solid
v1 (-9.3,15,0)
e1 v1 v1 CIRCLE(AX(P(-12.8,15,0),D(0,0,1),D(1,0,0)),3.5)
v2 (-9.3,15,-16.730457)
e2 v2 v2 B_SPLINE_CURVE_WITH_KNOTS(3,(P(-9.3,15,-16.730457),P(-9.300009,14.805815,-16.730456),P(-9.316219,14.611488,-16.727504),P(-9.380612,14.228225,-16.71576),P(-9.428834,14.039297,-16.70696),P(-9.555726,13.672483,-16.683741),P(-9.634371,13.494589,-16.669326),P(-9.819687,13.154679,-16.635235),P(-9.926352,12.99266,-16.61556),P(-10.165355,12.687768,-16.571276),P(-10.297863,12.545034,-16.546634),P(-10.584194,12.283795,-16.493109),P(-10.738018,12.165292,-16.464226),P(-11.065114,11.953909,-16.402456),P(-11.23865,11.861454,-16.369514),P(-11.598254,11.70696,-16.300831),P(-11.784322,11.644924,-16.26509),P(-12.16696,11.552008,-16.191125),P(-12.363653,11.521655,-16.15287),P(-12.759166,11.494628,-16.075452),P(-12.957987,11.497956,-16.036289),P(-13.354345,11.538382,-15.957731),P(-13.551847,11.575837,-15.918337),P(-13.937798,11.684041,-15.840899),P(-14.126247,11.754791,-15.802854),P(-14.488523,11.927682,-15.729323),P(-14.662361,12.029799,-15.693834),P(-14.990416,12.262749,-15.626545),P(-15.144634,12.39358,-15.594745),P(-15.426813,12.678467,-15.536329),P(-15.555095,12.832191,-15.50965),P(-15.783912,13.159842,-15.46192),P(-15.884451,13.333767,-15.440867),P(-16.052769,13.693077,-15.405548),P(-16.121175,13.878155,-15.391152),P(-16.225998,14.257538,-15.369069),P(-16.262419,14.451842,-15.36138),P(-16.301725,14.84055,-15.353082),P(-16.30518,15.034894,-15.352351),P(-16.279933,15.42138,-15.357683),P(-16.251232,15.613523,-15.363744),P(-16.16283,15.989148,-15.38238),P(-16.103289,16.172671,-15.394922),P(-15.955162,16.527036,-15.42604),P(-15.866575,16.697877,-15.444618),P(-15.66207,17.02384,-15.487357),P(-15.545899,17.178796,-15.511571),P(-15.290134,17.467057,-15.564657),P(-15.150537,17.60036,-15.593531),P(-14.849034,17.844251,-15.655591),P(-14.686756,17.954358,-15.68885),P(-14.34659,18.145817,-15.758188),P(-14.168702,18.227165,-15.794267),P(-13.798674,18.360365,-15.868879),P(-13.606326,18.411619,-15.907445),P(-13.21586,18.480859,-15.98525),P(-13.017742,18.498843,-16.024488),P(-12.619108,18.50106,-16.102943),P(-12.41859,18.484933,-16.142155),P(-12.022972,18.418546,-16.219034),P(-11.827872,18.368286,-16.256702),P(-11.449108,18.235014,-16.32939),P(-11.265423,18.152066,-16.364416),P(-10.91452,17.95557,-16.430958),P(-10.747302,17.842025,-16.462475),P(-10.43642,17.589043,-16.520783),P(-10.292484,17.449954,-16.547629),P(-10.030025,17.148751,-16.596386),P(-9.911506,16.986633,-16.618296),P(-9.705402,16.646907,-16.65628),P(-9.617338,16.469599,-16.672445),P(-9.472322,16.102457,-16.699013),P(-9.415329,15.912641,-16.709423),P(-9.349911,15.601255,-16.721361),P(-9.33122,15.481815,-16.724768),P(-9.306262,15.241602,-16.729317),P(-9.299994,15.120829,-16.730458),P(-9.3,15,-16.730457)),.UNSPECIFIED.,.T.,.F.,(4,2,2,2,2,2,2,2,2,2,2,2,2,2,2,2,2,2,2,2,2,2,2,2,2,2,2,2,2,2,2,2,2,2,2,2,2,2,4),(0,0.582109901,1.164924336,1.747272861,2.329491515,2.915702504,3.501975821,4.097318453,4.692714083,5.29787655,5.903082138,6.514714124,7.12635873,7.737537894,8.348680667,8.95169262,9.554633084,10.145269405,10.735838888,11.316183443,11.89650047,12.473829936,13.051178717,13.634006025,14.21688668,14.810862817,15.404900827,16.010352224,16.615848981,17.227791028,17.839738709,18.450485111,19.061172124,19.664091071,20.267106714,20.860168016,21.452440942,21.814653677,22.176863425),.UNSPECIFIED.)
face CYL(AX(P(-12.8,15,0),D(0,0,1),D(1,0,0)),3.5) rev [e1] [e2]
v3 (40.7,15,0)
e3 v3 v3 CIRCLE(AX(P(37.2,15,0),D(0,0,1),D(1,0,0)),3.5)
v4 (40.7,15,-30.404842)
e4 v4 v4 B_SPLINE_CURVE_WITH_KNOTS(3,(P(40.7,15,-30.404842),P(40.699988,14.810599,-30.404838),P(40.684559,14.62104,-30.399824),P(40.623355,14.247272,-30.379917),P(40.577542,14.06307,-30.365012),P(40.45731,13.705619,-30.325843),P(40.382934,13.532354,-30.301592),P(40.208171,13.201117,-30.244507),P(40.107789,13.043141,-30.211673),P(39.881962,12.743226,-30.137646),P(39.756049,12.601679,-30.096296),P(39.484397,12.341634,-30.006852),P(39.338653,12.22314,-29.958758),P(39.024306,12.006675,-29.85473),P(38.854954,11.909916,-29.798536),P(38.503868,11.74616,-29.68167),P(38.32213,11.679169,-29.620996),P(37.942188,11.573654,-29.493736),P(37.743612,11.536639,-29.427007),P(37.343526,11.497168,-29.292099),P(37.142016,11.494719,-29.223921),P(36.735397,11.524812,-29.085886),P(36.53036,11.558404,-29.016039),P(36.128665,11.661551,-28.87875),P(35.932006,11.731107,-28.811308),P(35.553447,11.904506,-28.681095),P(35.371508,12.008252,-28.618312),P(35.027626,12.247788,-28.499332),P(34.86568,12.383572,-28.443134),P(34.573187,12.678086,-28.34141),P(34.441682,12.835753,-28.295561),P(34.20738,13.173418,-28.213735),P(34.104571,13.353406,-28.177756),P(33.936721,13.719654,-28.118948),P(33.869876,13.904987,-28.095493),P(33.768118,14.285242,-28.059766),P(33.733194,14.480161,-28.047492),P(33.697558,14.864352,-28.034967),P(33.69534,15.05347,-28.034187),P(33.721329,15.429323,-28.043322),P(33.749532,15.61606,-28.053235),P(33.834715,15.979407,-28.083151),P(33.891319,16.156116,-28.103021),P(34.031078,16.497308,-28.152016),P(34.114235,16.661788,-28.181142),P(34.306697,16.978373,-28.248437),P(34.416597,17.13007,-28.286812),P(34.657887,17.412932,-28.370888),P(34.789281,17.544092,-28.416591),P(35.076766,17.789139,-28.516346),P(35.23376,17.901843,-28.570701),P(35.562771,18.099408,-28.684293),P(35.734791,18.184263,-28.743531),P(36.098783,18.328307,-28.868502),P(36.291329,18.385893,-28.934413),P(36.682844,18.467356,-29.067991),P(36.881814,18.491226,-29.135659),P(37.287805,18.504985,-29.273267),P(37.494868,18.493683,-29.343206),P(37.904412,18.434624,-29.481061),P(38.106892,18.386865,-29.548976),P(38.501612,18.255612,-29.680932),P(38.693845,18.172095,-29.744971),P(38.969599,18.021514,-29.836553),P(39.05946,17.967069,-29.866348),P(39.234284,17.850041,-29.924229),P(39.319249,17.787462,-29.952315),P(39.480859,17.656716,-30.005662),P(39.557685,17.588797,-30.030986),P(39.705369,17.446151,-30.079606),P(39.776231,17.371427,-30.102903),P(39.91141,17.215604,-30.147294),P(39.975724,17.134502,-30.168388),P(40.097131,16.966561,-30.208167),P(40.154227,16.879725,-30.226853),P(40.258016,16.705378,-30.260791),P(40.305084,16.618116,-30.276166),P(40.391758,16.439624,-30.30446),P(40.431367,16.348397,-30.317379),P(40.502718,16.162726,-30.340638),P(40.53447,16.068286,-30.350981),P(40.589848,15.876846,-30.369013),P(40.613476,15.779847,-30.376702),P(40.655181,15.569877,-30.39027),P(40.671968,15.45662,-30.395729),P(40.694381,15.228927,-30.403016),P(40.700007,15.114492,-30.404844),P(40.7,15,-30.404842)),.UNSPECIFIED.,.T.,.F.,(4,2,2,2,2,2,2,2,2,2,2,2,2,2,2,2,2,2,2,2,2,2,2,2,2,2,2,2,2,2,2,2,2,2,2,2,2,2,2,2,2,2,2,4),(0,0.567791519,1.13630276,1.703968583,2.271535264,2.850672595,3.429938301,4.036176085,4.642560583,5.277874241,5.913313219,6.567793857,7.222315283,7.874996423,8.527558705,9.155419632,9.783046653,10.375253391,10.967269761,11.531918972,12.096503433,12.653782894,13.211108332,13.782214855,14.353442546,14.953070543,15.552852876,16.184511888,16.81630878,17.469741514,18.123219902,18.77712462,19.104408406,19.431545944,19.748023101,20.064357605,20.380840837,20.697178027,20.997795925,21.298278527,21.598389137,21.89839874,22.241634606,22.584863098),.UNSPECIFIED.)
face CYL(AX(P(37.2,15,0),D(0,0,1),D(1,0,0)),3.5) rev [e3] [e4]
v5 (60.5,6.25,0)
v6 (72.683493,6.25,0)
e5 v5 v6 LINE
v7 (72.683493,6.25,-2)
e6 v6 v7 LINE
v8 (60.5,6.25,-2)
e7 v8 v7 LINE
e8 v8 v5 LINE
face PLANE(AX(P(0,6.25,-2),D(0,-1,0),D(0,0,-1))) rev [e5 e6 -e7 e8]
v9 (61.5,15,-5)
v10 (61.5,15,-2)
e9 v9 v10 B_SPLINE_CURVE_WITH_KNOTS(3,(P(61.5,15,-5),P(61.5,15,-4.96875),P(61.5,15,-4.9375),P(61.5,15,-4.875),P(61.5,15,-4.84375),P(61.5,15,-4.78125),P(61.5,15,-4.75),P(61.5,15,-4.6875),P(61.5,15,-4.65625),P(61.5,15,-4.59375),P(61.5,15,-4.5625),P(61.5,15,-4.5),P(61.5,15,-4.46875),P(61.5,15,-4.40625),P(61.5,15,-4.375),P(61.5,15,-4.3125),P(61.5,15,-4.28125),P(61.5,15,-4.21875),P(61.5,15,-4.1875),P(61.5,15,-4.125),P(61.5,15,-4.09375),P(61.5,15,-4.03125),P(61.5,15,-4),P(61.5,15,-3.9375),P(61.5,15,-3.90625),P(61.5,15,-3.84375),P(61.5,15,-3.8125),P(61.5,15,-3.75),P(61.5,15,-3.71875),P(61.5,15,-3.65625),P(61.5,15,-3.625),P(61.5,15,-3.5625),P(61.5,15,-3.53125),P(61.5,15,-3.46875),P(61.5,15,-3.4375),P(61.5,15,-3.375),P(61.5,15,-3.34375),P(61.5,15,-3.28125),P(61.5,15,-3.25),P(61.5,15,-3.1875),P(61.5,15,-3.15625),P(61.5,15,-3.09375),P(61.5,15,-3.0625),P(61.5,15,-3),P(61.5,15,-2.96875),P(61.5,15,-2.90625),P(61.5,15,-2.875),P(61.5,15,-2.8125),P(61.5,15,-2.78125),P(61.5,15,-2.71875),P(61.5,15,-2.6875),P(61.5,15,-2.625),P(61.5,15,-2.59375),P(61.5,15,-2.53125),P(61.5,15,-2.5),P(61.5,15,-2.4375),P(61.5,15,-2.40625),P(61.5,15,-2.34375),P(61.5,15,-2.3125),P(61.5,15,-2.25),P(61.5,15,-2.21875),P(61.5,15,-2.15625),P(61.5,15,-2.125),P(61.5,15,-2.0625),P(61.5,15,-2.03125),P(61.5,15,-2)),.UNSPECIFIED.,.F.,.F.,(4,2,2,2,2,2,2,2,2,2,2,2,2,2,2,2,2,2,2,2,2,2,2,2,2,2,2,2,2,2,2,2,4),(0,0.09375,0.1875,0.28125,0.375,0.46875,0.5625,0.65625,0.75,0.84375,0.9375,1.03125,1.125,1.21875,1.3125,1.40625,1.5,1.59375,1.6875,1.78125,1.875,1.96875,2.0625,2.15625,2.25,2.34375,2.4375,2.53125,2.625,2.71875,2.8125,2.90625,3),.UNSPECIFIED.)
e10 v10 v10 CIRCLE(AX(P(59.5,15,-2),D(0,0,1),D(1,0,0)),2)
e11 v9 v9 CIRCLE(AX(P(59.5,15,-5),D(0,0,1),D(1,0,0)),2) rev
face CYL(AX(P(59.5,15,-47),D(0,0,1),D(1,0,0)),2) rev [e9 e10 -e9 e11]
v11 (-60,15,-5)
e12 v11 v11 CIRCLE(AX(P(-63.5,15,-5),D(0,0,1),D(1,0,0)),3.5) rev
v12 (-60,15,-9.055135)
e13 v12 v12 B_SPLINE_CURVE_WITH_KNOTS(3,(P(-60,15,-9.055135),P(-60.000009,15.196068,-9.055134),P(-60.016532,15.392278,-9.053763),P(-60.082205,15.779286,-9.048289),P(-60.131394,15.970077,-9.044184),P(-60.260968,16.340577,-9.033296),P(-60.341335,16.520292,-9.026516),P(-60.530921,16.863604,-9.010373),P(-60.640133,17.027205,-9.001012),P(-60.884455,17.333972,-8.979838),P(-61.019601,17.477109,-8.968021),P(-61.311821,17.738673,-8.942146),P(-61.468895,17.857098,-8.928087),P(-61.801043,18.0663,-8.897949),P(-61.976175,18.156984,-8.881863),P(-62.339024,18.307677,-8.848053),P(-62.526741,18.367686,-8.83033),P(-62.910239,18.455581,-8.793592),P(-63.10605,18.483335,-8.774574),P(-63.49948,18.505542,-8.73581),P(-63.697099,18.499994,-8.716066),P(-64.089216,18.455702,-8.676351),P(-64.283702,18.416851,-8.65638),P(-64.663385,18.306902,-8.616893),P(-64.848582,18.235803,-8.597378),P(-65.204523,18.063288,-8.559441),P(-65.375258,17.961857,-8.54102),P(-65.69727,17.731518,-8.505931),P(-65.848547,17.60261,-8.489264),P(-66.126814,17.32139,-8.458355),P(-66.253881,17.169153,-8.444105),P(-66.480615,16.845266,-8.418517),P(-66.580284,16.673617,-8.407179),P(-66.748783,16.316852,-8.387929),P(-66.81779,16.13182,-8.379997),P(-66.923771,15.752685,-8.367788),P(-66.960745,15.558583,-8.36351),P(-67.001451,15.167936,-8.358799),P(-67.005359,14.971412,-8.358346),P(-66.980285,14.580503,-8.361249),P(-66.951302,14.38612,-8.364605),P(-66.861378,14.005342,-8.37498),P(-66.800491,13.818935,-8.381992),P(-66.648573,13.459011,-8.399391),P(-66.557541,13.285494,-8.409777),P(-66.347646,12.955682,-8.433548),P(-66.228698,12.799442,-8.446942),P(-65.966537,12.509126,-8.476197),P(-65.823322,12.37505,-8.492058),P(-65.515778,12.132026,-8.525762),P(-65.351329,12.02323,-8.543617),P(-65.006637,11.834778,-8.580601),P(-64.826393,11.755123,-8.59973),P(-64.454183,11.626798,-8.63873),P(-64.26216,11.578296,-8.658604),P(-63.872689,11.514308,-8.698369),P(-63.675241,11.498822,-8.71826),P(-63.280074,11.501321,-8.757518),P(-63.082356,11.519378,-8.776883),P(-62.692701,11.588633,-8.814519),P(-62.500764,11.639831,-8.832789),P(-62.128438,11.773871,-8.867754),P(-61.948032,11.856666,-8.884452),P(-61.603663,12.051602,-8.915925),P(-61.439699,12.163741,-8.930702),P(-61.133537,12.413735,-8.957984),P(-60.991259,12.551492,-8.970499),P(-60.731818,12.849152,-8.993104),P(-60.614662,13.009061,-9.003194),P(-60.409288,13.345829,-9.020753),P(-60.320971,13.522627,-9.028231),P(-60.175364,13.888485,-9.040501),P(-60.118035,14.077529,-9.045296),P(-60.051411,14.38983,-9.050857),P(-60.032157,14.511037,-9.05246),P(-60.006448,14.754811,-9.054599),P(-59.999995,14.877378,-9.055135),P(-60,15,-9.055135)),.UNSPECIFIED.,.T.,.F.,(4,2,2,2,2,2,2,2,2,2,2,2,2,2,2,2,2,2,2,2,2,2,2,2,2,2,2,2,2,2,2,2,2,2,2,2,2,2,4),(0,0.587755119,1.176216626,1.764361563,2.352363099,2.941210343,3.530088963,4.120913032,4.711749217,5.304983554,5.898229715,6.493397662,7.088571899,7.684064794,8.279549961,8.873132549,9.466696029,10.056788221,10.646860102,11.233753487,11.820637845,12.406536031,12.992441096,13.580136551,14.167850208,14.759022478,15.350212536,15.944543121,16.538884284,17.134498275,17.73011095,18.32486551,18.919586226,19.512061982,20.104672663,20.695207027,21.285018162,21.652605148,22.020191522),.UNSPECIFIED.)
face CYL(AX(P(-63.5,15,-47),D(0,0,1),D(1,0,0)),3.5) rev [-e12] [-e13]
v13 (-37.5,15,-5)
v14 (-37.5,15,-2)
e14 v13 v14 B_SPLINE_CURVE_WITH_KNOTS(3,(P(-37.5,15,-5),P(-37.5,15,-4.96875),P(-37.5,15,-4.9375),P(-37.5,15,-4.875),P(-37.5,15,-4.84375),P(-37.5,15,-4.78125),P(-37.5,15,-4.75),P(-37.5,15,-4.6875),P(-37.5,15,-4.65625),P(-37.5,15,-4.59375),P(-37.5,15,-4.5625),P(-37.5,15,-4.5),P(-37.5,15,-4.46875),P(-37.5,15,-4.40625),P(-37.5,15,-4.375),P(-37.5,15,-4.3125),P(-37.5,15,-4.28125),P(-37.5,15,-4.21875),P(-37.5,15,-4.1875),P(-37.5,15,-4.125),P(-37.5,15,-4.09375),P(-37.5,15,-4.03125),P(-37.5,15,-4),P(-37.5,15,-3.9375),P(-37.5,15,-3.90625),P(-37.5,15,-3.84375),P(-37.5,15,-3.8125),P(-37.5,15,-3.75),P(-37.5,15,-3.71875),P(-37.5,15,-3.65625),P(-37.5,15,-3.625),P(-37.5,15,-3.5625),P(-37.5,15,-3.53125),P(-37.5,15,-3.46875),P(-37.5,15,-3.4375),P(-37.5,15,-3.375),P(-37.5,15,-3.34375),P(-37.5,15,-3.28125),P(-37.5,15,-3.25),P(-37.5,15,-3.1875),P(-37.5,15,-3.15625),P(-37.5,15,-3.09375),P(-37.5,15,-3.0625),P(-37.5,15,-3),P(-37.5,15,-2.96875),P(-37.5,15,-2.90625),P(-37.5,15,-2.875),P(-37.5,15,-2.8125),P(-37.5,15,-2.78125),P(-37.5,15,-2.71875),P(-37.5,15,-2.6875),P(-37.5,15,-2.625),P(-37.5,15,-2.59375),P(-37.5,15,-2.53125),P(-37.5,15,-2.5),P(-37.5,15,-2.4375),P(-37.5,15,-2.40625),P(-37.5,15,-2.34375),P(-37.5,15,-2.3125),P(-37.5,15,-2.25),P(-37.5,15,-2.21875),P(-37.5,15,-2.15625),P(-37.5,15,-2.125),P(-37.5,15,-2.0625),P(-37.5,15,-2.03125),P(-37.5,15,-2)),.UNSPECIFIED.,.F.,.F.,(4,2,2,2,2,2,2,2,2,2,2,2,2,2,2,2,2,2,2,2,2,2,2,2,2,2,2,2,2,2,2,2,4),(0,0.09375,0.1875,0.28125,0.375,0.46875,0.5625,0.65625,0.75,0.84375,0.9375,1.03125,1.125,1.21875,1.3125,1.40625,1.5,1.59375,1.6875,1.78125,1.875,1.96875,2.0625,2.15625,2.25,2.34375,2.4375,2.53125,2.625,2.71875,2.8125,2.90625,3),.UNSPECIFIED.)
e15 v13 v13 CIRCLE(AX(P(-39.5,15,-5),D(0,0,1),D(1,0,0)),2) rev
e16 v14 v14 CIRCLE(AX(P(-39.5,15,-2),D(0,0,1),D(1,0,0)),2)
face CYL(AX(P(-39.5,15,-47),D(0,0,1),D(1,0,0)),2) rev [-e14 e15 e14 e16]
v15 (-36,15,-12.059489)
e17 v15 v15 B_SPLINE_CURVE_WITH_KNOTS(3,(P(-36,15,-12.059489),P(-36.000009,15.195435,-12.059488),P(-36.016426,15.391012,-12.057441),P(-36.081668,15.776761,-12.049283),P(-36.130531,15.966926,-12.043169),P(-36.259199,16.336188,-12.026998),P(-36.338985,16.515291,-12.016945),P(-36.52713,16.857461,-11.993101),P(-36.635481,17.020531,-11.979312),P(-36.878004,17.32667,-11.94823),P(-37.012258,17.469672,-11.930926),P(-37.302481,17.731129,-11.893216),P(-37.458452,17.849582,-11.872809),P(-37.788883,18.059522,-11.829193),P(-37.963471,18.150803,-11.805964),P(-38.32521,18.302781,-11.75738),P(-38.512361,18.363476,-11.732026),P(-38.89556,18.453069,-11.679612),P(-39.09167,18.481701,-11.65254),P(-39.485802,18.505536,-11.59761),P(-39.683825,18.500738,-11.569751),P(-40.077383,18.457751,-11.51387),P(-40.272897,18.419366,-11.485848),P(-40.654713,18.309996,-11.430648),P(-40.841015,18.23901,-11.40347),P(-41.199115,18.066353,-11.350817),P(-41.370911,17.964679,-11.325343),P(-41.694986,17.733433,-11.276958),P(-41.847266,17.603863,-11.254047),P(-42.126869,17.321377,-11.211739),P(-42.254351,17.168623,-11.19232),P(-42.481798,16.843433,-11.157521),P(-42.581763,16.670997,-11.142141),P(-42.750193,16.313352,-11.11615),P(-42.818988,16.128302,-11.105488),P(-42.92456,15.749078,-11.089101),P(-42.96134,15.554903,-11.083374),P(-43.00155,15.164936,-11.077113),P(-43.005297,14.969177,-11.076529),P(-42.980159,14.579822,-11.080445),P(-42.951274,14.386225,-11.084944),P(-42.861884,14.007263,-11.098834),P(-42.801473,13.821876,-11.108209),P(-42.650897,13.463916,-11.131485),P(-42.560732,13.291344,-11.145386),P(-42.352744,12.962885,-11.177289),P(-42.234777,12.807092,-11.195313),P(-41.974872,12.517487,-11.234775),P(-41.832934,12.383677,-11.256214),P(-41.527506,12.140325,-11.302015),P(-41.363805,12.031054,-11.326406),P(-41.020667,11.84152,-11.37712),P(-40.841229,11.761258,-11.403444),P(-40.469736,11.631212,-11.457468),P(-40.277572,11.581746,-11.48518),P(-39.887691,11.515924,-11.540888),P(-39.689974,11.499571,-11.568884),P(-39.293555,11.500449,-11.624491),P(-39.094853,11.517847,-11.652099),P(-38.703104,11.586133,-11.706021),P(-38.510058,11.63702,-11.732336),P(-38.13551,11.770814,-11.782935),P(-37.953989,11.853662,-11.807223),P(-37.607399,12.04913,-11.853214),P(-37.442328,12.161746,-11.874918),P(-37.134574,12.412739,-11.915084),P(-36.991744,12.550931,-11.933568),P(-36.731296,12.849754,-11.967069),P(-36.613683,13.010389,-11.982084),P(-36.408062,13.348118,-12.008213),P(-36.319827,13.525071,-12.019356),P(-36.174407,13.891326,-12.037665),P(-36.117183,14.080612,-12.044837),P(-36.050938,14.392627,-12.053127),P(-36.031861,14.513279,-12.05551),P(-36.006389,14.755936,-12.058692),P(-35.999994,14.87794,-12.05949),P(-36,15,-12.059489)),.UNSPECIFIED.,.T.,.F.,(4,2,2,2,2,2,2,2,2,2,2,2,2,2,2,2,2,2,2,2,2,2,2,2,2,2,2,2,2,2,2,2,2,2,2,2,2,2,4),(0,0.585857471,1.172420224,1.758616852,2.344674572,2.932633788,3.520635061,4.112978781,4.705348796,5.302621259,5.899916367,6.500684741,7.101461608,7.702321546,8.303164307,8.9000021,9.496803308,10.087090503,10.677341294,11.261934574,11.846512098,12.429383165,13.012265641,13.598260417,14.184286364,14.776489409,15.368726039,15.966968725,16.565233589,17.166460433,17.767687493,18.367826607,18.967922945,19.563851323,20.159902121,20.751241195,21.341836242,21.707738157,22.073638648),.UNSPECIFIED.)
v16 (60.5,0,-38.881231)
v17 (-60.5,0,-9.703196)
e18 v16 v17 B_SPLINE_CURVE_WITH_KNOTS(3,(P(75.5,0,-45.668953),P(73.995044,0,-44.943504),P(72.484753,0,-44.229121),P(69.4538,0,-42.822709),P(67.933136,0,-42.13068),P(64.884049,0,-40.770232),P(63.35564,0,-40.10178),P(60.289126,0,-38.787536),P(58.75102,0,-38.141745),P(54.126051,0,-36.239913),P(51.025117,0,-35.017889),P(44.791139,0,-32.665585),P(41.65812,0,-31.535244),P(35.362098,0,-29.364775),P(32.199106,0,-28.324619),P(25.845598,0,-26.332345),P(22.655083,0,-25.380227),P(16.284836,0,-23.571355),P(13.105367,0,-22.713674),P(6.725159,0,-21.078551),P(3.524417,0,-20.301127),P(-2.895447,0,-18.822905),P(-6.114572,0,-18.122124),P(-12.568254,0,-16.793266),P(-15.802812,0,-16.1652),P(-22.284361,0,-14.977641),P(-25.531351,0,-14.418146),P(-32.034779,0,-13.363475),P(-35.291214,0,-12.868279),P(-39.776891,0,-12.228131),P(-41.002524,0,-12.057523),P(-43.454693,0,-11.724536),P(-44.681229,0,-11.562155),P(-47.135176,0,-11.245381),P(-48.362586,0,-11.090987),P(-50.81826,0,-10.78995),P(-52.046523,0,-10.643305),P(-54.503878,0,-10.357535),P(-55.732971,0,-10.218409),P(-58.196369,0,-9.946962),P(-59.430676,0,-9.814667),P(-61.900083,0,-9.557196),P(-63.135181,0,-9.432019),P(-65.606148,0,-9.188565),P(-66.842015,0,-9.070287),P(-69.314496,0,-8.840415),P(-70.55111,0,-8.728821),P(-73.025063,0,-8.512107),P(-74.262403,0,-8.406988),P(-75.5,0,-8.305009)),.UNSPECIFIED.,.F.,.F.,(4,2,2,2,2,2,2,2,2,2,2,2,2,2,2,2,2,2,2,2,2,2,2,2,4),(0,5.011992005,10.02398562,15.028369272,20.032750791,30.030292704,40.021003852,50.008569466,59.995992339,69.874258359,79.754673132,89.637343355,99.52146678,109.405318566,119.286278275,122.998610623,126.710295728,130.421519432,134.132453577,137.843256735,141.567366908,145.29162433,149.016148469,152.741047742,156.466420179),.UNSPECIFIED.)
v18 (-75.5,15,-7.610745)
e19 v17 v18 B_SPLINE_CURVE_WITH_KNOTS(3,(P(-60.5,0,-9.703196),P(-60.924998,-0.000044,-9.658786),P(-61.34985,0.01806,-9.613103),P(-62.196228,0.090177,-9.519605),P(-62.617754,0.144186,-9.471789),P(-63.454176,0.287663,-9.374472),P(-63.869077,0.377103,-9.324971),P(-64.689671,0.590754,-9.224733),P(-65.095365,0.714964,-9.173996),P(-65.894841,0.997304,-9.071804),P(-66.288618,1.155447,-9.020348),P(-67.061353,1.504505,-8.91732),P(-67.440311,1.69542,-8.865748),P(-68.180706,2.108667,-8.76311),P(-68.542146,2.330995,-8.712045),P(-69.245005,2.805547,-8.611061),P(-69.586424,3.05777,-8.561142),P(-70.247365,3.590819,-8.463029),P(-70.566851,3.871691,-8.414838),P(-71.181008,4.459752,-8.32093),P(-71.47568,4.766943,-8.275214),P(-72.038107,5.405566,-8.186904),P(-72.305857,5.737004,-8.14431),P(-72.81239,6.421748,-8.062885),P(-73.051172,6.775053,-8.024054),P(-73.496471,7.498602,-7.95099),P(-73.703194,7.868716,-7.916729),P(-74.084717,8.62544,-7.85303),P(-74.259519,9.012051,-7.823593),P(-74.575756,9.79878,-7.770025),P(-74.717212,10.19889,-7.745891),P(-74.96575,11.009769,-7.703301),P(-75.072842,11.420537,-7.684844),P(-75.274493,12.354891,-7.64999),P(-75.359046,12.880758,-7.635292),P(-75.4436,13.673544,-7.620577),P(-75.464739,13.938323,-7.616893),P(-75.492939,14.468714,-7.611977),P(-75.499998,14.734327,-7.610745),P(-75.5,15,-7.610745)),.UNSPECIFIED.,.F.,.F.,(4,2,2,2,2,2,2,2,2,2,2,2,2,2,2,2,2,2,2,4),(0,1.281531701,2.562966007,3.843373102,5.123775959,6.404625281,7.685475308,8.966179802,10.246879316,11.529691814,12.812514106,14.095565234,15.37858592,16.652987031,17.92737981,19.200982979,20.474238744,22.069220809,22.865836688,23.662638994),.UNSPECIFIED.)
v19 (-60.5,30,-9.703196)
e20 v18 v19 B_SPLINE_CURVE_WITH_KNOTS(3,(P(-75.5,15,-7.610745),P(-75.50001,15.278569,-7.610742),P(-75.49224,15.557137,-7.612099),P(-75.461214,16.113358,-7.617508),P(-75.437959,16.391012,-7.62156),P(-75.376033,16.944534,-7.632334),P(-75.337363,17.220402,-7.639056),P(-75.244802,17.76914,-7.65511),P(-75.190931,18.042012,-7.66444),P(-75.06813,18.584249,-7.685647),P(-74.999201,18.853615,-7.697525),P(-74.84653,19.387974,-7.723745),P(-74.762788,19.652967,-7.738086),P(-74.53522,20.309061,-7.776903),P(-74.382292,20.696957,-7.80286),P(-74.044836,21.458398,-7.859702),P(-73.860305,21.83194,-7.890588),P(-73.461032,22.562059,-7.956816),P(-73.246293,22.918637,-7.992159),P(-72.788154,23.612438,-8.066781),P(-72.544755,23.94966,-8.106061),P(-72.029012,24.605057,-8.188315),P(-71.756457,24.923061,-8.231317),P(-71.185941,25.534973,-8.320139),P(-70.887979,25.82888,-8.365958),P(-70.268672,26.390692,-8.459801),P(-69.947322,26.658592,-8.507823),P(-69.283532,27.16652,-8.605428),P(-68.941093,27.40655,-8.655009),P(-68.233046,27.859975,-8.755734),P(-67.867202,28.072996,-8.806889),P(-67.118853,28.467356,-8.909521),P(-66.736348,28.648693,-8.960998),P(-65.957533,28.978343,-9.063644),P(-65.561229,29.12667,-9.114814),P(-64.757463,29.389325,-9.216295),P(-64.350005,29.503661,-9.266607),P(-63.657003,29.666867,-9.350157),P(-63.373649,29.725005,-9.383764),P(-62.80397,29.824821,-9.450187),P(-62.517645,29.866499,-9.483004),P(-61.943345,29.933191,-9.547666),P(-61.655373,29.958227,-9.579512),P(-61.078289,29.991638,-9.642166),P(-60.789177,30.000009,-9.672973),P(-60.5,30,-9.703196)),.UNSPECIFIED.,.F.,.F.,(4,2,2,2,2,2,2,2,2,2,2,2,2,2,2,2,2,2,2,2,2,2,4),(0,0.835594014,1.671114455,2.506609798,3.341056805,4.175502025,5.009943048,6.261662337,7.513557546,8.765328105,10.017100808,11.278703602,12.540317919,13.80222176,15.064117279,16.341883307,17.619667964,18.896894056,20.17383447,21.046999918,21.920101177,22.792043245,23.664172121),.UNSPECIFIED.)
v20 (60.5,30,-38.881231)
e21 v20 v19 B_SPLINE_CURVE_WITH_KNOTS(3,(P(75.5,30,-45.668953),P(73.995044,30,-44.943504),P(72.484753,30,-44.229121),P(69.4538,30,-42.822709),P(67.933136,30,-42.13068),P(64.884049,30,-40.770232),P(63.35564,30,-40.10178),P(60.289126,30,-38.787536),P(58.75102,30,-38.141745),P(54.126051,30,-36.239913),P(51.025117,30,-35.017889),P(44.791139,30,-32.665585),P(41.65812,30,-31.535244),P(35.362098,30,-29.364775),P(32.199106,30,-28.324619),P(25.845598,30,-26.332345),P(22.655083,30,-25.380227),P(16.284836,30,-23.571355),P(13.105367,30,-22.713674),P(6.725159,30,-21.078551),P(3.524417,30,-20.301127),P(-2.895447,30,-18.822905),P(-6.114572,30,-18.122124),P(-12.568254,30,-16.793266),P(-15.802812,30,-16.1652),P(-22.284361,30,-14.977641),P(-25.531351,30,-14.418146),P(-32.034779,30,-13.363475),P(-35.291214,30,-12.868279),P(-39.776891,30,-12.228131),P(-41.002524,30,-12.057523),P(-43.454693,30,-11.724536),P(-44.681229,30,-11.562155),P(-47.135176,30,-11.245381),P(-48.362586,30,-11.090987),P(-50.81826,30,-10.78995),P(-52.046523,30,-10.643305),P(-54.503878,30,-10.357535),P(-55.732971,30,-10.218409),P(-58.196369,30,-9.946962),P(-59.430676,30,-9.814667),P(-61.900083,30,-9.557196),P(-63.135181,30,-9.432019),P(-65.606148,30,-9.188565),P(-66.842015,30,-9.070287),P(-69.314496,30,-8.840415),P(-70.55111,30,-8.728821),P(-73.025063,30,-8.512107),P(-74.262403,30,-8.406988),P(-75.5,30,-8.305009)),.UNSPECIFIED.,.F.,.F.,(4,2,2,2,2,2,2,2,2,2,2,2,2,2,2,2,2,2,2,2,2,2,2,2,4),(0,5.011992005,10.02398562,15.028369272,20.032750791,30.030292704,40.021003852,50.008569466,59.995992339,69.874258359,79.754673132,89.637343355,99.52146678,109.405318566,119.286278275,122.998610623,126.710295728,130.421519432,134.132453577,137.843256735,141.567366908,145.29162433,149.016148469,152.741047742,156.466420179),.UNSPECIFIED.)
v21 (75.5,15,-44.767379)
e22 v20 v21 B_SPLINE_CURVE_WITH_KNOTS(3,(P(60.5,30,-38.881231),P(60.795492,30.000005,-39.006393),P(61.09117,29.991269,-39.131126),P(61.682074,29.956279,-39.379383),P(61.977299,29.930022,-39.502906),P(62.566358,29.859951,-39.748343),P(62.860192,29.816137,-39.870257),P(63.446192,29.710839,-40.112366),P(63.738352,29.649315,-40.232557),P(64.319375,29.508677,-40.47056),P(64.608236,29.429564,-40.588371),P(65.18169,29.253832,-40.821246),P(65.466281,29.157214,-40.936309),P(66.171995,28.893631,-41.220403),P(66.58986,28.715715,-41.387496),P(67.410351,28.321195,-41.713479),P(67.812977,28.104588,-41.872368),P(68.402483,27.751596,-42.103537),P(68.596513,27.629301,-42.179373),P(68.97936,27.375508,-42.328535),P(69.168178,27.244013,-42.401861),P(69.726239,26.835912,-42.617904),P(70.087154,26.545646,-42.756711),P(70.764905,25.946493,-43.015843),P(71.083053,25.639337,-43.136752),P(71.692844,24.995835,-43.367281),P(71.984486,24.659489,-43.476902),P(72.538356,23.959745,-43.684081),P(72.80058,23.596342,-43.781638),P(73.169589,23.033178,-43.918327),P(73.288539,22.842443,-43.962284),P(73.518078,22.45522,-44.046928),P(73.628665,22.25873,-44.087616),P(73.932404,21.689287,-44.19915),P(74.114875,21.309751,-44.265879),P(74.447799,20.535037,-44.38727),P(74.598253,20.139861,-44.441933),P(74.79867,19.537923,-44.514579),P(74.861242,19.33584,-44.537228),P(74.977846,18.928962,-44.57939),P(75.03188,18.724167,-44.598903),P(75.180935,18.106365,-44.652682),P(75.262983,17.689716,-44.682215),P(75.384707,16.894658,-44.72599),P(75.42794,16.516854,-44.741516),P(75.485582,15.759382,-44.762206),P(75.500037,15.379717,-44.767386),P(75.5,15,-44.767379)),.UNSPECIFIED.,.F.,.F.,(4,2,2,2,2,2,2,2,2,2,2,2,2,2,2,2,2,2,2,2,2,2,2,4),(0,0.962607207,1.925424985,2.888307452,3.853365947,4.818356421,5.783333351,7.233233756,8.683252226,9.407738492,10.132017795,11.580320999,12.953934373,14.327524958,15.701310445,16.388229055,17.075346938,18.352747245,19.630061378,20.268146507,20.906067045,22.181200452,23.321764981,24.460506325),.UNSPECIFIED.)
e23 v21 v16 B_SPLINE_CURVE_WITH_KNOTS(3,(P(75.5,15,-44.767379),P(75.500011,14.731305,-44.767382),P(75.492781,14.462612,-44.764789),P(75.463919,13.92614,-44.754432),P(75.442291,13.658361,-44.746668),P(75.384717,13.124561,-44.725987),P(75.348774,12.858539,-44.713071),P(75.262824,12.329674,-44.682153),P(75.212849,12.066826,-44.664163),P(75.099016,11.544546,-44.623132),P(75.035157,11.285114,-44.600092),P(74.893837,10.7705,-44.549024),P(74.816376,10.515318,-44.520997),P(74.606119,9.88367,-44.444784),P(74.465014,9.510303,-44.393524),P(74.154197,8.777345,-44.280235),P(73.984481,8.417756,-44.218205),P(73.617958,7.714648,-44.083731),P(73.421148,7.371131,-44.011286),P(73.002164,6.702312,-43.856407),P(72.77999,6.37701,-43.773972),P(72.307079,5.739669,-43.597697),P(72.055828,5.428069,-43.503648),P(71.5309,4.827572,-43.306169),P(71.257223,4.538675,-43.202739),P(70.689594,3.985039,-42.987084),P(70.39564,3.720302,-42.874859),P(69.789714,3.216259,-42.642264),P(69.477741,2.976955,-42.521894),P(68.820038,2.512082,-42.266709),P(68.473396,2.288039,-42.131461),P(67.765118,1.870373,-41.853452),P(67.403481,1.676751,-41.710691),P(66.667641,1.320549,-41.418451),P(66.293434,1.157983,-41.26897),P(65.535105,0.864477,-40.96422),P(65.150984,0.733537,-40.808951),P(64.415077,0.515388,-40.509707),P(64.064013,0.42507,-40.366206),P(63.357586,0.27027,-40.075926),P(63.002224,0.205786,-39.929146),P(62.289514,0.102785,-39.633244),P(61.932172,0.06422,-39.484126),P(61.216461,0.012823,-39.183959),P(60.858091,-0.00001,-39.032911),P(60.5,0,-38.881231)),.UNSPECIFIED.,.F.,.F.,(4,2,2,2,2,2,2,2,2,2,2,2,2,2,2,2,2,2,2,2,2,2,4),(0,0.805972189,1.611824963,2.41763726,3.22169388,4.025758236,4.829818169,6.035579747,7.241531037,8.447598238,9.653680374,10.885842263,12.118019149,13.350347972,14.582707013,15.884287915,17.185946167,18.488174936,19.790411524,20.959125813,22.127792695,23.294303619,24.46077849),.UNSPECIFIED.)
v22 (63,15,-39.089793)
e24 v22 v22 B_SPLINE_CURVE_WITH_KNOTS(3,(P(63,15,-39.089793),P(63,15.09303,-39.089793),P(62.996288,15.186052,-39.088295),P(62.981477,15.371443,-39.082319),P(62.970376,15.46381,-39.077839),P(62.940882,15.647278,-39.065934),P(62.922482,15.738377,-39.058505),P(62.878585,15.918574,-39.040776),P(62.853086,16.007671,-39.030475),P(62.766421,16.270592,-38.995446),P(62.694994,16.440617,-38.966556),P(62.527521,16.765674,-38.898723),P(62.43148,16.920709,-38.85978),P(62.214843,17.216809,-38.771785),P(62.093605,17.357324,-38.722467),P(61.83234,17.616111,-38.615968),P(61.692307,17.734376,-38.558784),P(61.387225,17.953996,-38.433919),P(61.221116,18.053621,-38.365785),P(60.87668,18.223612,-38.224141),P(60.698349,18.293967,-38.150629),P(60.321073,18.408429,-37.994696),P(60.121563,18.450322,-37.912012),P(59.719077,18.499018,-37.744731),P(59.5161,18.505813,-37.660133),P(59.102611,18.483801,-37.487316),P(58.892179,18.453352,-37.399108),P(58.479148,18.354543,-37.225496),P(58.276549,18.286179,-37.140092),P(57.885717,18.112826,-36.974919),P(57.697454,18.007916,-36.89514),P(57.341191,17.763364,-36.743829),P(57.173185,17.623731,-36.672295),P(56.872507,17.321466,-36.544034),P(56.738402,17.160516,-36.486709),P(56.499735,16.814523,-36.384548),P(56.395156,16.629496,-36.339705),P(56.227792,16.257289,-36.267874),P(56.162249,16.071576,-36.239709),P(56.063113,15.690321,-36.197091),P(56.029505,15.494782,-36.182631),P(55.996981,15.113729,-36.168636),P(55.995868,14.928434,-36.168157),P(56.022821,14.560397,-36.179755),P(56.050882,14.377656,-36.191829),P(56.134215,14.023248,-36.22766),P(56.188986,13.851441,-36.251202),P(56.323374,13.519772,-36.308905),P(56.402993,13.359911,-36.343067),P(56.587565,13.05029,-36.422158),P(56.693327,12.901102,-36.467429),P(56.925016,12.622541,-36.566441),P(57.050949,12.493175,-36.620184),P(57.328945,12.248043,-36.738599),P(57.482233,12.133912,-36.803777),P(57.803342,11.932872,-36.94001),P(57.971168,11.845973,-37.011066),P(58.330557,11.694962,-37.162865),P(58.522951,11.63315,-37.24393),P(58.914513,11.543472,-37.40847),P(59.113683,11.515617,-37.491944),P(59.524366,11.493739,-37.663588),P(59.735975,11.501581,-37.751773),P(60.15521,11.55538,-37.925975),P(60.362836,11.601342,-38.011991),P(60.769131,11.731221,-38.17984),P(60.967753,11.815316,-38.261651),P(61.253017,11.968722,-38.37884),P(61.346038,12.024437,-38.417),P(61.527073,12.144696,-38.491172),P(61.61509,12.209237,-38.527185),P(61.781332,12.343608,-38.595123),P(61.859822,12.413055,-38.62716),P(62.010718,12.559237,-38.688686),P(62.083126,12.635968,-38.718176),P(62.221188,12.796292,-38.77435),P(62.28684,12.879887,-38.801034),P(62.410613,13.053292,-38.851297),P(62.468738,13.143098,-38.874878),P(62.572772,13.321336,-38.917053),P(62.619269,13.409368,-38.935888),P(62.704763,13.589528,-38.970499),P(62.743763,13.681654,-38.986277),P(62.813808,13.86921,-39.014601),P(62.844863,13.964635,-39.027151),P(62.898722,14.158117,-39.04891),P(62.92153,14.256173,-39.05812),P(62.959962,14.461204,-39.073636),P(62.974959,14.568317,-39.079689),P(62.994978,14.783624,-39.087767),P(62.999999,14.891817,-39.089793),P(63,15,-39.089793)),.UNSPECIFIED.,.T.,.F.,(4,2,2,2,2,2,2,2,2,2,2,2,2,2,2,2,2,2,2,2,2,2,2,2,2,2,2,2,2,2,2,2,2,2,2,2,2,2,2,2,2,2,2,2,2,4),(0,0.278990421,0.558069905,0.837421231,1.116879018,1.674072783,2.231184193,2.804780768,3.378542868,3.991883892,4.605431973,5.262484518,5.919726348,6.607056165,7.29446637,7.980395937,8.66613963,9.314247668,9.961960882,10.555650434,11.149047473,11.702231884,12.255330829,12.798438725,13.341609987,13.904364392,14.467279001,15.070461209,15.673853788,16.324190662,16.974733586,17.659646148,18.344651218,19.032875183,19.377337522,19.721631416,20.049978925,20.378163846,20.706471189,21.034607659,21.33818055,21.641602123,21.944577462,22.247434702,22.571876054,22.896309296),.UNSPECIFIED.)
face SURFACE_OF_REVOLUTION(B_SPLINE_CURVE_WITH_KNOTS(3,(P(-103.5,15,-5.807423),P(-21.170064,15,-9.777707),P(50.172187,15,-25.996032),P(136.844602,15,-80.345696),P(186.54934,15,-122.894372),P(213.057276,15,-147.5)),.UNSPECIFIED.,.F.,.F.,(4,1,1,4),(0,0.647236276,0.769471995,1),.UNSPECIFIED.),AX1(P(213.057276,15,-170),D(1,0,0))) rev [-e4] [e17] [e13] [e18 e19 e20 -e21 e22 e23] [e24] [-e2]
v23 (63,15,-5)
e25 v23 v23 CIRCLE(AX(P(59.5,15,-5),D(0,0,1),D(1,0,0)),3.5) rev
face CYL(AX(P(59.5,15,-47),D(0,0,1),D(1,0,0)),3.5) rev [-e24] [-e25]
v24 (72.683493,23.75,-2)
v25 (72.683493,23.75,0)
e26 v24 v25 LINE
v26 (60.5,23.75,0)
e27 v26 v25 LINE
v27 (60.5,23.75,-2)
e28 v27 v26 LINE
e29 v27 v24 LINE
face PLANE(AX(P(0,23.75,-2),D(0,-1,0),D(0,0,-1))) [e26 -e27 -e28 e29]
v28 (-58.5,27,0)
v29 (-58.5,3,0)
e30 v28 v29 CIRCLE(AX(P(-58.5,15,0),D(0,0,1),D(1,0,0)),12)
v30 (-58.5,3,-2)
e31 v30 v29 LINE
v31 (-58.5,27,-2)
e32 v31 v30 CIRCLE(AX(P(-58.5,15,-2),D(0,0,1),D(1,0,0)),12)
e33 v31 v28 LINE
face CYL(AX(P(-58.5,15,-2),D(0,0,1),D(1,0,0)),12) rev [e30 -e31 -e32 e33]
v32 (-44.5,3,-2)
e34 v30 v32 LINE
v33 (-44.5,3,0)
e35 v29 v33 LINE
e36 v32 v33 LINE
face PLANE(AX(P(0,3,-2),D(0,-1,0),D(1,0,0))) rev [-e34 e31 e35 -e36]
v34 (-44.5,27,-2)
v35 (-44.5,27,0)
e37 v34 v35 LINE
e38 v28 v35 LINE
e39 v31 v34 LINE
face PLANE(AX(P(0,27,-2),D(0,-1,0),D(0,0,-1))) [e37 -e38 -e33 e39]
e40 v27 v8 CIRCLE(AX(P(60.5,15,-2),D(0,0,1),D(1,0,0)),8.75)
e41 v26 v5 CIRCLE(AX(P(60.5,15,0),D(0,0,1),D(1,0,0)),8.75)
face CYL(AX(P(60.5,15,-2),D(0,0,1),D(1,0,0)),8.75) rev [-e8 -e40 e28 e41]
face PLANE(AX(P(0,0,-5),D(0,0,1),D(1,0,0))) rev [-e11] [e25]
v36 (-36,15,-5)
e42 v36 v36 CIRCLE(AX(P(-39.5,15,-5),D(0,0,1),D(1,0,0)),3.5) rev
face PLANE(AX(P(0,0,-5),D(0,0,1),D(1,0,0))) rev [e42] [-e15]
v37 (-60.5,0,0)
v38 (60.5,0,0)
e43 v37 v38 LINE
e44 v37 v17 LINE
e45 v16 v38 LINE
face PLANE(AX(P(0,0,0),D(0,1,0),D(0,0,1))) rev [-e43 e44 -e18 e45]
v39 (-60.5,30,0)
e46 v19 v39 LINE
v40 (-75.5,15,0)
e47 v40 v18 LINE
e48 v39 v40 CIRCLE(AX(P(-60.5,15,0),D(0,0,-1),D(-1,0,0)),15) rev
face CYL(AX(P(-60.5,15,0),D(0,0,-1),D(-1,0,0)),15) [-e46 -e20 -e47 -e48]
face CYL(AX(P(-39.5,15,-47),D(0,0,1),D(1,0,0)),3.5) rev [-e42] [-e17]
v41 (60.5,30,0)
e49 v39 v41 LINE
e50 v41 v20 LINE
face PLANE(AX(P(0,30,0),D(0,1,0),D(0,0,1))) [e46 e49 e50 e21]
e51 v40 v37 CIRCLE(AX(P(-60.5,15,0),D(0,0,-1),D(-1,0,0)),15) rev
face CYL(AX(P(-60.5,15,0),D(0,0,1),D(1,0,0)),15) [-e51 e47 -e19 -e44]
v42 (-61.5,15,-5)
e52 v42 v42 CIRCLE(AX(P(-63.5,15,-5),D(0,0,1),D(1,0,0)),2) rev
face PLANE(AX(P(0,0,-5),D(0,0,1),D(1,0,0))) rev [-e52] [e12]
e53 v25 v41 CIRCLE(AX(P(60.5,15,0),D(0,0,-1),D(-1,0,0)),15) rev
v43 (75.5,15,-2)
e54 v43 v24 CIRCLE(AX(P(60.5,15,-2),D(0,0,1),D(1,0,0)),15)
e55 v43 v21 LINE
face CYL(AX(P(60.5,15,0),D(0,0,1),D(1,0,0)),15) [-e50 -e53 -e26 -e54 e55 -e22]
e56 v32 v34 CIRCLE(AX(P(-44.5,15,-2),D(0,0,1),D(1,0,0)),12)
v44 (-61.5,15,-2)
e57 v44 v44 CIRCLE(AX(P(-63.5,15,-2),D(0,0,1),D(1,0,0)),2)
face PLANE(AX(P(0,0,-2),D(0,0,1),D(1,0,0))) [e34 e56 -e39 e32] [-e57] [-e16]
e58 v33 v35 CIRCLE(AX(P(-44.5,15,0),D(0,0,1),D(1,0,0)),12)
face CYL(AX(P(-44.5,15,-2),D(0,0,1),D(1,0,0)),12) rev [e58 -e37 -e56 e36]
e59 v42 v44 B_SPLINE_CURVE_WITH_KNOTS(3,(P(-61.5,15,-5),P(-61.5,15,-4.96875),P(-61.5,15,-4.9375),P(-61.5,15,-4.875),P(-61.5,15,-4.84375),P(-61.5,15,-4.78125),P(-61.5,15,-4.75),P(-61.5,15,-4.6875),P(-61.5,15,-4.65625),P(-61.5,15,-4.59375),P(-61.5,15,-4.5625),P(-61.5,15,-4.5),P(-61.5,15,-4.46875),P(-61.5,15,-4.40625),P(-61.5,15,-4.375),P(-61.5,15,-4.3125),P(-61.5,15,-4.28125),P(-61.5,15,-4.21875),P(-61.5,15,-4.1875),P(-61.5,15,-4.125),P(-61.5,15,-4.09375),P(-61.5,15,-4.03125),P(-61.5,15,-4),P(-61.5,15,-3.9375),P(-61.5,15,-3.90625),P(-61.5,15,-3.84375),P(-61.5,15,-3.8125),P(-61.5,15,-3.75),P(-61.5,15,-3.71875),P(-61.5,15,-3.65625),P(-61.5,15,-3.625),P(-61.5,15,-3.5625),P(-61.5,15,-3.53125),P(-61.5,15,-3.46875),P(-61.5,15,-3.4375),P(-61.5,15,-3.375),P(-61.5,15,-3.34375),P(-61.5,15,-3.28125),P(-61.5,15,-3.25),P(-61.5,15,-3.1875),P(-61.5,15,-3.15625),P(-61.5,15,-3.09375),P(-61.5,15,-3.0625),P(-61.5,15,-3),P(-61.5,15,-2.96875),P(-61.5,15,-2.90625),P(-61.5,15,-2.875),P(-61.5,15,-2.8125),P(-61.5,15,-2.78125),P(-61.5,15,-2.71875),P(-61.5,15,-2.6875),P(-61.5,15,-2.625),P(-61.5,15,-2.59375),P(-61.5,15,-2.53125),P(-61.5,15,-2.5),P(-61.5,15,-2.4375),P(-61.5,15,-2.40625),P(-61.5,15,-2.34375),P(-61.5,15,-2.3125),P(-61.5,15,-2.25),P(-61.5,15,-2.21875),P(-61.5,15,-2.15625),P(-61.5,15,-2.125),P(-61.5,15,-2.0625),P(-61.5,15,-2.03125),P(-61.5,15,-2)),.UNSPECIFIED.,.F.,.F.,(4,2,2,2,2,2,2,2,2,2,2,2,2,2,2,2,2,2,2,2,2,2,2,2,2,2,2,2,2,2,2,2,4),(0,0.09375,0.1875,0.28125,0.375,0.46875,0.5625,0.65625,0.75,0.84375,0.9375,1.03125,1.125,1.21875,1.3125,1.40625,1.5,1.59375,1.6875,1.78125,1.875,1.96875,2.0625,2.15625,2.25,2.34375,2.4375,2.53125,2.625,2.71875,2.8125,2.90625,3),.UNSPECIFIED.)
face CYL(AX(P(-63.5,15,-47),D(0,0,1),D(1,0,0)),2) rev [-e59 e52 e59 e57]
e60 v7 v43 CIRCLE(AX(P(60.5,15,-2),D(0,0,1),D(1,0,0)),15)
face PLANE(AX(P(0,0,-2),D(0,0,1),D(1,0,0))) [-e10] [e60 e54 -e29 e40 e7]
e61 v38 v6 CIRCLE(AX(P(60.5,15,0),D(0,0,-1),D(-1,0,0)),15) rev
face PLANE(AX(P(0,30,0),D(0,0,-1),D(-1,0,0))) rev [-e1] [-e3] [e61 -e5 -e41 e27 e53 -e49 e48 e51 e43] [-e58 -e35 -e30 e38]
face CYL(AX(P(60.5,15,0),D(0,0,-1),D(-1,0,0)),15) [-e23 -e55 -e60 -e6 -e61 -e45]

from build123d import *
from build123d.topology import SkipClean

# Parameters (mm, degrees)
BOSS_EXTRUDE1_DEPTH      = 30
SKETCH10_W               = 151
SKETCH10_H               = 30
BOSS_EXTRUDE2_DEPTH      = 40
SKETCH2_R                = 2
CUT_EXTRUDE1_DEPTH       = 94.198193522
SKETCH2_6_R              = 2
CUT_EXTRUDE2_DEPTH       = 2
SKETCH2_7_R              = 2
CUT_EXTRUDE3_DEPTH       = 2
F_7_0_7_DIAMETER_HOLE1_D = 7
CUT_EXTRUDE5_START       = 5
SKETCH9_R                = 3.5
CUT_EXTRUDE5_DEPTH       = 89.198193522
FILLET1_R                = 15


with BuildPart() as part:
    # Sketch1 → Boss-Extrude1 (new body)
    with BuildSketch(Plane(origin=(0, 0, 0), x_dir=(1, 0, 0), z_dir=(0, 1, 0))):
        Polygon((-25.3, 7), (49.7, 7), (75.5, 7), (75.5, 0), (-75.5, 0), (-75.5, 7), align=None)
    extrude(amount=BOSS_EXTRUDE1_DEPTH)

    # Sketch10 → Boss-Extrude2 (add)
    with BuildSketch(Plane(origin=(0, 0, -7), x_dir=(-1, 0, 0), z_dir=(0, 0, -1))):
        with Locations((0, 15)):
            Rectangle(SKETCH10_W, SKETCH10_H)
    extrude(amount=BOSS_EXTRUDE2_DEPTH)

    # Sketch13 → Cut-Revolve1 (revolve, cut)
    with SkipClean():  # the faces are left unmerged after this step: merging them gives an invalid solid
        with BuildSketch(Plane(origin=(0, 15, 0), x_dir=(1, 0, 0), z_dir=(0, 1, 0))):
            with BuildLine():
                Line((213.057276424, 147.5), (-103.5, 147.5))
                Line((-103.5, 147.5), (-103.5, 5.807423347))
                add(Edge.make_bspline(
                    [(-103.5, 5.807423347), (-21.17006382, 9.777706594), (50.172186829, 25.996032335), (136.844602336, 80.345696305), (186.549339742, 122.894371989), (213.057276424, 147.5)],
                    knots=[0, 0, 0, 0, 0.647236276, 0.769471995, 1, 1, 1, 1], degree=3))
            make_face()
        revolve(axis=Axis((213.057276424, 15, -170), (-1, 0, 0)), mode=Mode.SUBTRACT)
    add(part.part.scale(1), mode=Mode.REPLACE)  # the faces are merged on a copy

    # Sketch2 → Cut-Extrude1 (cut, through all)
    with BuildSketch(Plane.XY):
        with Locations((-39.5, 15)):
            Circle(SKETCH2_R)
        with Locations((59.5, 15)):
            Circle(SKETCH2_R)
        with Locations((-63.5, 15)):
            Circle(SKETCH2_R)
    extrude(amount=-CUT_EXTRUDE1_DEPTH, mode=Mode.SUBTRACT)

    # Sketch2<6> → Cut-Extrude2 (cut)
    with BuildSketch(Plane.XY):
        with BuildLine():
            Line((-58.5, 3), (-44.5, 3))
            ThreePointArc((-44.5, 3), (-32.5, 15), (-44.5, 27))
            Line((-44.5, 27), (-58.5, 27))
            ThreePointArc((-58.5, 27), (-70.5, 15), (-58.5, 3))
        make_face()
        with Locations((-39.5, 15)):
            Circle(SKETCH2_6_R, mode=Mode.SUBTRACT)
        with Locations((-63.5, 15)):
            Circle(SKETCH2_6_R, mode=Mode.SUBTRACT)
    extrude(amount=-CUT_EXTRUDE2_DEPTH, mode=Mode.SUBTRACT)

    # Sketch2<7> → Cut-Extrude3 (cut)
    # profile 1 of 2: a face of its own
    with BuildSketch(Plane.XY):
        with BuildLine():
            Line((60.5, 23.75), (75.5, 23.75))
            Line((75.5, 23.75), (75.5, 6.25))
            Line((75.5, 6.25), (60.5, 6.25))
            ThreePointArc((60.5, 6.25), (51.75, 15), (60.5, 23.75))
        make_face()
        with Locations((59.5, 15)):
            Circle(SKETCH2_7_R, mode=Mode.SUBTRACT)
    # profile 2 of 2: a face of its own
    with BuildSketch(Plane.XY):
        with BuildLine():
            Line((-58.5, 27), (-44.5, 27))
            ThreePointArc((-44.5, 27), (-32.5, 15), (-44.5, 3))
            Line((-44.5, 3), (-58.5, 3))
            ThreePointArc((-58.5, 3), (-70.5, 15), (-58.5, 27))
        make_face()
        with Locations((-63.5, 15)):
            Circle(SKETCH2_7_R, mode=Mode.SUBTRACT)
        with Locations((-39.5, 15)):
            Circle(SKETCH2_7_R, mode=Mode.SUBTRACT)
    extrude(amount=-CUT_EXTRUDE3_DEPTH, mode=Mode.SUBTRACT)

    # Ø7.0 (7) Diameter Hole1 (through all)
    with Locations(Plane(origin=(0, 0, 0), x_dir=(-1, 0, 0), z_dir=(0, 0, 1))):
        with Locations((-37.2, -15), (12.8, -15)):
            Hole(F_7_0_7_DIAMETER_HOLE1_D / 2)

    # Sketch9 → Cut-Extrude5 (cut, through all)
    with BuildSketch(Plane(origin=(0, 0, 0), x_dir=(-1, 0, 0), z_dir=(0, 0, -1)).offset(CUT_EXTRUDE5_START)):
        with Locations(Location((-59.5, 15, 0), (0, 0, 180))):
            Circle(SKETCH9_R)
        with Locations(Location((39.5, 15, 0), (0, 0, 180))):
            Circle(SKETCH9_R)
        with Locations(Location((63.5, 15, 0), (0, 0, 180))):
            Circle(SKETCH9_R)
    extrude(amount=CUT_EXTRUDE5_DEPTH, mode=Mode.SUBTRACT)

    # Fillet1
    fillet1_edges = [part.edges().sort_by_distance(p)[0] for p in [
        (75.5, 30, -22.834476377),
        (-75.5, 0, -4.152504649),
        (75.5, 0, -22.834476377),
        (-75.5, 30, -4.152504649),
    ]]
    fillet(fillet1_edges, radius=FILLET1_R - 0.0001)  # a hair under: the kernel refuses the full size


solid = part.part
